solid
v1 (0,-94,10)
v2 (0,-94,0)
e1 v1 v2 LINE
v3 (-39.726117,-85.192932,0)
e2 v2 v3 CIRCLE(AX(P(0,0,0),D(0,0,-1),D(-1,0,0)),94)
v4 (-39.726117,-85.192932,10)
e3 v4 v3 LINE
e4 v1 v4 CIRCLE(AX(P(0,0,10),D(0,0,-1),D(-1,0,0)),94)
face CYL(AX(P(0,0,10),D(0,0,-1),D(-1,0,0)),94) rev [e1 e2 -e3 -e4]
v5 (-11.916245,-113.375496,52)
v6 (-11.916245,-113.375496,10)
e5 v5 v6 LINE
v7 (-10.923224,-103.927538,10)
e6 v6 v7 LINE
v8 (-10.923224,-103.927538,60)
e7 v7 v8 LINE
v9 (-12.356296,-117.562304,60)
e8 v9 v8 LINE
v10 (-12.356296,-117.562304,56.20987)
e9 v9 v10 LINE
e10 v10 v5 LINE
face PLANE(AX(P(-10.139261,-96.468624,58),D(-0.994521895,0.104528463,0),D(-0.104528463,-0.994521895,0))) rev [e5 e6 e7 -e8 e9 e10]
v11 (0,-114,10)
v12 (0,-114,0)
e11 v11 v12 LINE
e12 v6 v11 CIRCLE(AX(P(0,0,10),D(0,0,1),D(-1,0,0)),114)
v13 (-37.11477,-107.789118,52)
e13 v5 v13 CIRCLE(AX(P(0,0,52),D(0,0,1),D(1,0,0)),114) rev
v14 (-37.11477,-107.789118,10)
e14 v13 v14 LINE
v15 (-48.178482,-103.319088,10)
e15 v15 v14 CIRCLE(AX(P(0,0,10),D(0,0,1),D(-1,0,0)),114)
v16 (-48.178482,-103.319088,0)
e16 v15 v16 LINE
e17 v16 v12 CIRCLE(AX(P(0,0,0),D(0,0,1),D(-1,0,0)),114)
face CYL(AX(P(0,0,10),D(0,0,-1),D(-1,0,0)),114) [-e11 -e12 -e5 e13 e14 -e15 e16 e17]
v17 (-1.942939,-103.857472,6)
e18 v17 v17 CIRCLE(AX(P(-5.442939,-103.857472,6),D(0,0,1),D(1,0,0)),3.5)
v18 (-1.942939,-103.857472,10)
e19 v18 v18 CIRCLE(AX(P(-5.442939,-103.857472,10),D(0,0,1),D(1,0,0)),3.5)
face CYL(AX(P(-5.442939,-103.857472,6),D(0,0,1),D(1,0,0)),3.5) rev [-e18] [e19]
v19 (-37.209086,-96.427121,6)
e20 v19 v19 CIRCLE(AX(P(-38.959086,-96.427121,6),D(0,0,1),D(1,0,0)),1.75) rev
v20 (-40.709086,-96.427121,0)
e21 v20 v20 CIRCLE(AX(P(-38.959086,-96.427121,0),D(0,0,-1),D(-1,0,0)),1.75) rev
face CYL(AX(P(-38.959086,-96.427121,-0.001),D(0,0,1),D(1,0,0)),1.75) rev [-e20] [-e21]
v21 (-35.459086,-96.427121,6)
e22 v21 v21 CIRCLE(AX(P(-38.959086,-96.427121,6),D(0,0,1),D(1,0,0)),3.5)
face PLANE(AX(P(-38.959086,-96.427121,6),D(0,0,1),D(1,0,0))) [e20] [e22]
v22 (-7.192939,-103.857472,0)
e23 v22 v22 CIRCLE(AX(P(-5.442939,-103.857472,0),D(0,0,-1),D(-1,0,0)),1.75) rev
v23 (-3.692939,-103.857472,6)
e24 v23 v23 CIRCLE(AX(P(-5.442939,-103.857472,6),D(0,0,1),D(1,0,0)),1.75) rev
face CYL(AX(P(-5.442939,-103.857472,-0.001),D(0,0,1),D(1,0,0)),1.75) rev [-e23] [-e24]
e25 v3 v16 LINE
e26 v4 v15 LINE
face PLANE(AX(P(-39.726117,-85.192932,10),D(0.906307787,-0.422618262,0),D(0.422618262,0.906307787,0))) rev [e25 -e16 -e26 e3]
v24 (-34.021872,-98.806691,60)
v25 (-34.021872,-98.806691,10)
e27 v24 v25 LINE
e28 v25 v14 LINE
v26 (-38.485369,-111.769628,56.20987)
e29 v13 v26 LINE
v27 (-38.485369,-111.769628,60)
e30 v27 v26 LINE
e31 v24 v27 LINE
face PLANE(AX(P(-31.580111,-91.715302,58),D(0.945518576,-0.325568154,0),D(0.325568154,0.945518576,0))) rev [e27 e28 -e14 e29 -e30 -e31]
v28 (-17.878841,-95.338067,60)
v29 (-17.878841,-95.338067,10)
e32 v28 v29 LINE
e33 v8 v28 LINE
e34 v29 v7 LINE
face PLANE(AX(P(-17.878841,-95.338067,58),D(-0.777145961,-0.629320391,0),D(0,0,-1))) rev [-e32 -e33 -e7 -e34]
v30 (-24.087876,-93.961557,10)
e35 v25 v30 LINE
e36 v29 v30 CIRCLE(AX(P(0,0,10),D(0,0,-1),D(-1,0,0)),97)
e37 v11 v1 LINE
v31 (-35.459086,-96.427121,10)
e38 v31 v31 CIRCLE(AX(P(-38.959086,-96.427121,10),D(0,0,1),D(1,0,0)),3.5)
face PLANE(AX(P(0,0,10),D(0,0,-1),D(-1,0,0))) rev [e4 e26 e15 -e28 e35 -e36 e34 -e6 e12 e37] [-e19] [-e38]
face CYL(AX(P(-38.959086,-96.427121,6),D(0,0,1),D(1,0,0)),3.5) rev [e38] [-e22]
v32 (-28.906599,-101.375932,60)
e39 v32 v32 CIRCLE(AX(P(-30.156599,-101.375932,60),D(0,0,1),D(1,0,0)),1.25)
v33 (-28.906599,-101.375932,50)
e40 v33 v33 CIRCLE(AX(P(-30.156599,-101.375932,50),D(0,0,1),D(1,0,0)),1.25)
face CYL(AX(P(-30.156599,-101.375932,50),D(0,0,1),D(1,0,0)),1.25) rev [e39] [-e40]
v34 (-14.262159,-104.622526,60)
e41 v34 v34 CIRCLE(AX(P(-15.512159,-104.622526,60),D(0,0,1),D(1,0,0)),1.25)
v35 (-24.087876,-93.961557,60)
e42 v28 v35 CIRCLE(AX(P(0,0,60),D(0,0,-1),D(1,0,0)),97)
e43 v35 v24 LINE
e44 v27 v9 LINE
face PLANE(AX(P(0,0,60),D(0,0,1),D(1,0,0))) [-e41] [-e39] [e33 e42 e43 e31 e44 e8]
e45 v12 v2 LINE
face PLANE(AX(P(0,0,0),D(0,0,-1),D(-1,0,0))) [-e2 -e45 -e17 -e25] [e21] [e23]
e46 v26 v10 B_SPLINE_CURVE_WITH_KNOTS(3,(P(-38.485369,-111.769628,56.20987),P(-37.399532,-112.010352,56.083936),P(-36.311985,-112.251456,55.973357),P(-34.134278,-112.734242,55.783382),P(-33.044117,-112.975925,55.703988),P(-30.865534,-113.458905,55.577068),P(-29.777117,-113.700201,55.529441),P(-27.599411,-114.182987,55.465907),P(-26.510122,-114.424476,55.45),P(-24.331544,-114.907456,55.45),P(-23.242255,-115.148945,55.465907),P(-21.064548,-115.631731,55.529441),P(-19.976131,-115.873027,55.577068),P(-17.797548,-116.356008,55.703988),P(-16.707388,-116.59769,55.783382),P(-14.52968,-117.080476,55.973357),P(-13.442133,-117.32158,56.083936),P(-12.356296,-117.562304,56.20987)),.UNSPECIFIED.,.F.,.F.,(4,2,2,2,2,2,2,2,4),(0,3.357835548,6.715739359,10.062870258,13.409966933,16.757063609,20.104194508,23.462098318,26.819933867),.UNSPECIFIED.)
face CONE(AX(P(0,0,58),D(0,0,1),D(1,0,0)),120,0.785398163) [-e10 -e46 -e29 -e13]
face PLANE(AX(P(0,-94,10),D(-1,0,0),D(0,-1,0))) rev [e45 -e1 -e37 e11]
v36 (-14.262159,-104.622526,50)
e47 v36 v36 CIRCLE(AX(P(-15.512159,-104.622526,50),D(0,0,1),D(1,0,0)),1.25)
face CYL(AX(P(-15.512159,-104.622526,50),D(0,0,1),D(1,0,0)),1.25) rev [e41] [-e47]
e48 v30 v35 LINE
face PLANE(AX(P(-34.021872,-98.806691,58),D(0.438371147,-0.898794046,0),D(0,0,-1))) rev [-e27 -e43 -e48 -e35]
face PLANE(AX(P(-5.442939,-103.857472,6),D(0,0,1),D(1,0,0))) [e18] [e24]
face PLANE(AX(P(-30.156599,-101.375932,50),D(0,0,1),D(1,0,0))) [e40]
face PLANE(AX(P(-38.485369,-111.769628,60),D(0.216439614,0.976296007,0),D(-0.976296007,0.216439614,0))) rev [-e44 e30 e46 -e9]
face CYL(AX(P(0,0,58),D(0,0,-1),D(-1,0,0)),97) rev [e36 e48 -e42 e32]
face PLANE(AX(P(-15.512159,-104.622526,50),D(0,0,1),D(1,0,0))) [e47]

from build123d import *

# Parameters (mm, degrees)
BOSS_EXTRU_1_DEPTH      = 10
BOSS_EXTRU_2_DEPTH      = 48
BOSS_EXTRU_3_DEPTH      = 2
CHANFREIN1_SIZE         = 6
ENL_V_MAT_EXTRU_1_REACH = 138.536
ESQUISSE5_R             = 1.75
ESQUISSE6_R             = 3.5
ENL_V_MAT_EXTRU_2_DEPTH = 4
CHANFREIN2_SIZE         = 7.5
ESQUISSE7_R             = 1.25
ENL_V_MAT_EXTRU_3_DEPTH = 10


with BuildPart() as part:
    # Esquisse1 → Boss.-Extru.1 (new body)
    with BuildSketch(Plane.XY):
        with BuildLine():
            Line((-39.726116604, -85.192931981), (-48.178481838, -103.319087722))
            ThreePointArc((-48.178481838, -103.319087722), (-24.674115989, -111.297744812), (0, -114))
            Line((0, -114), (0, -94))
            ThreePointArc((0, -94), (-20.34532371, -91.771824669), (-39.726116604, -85.192931981))
        make_face()
    extrude(amount=BOSS_EXTRU_1_DEPTH)

    # Esquisse2 → Boss.-Extru.2 (add)
    with BuildSketch(Plane.XY.offset(10)):
        with BuildLine():
            Line((-31.580110982, -91.715301833), (-37.114769608, -107.789117618))
            ThreePointArc((-37.114769608, -107.789117618), (-24.674115989, -111.297744812), (-11.916244813, -113.375496072))
            Line((-11.916244813, -113.375496072), (-10.139260937, -96.468623851))
            ThreePointArc((-10.139260937, -96.468623851), (-20.994642552, -94.700712691), (-31.580110982, -91.715301833))
        make_face()
    extrude(amount=BOSS_EXTRU_2_DEPTH)

    # Esquisse4 → Boss.-Extru.3 (add)
    with BuildSketch(Plane.XY.offset(58)):
        with BuildLine():
            Line((-38.485369249, -111.769628004), (-12.356296065, -117.562304069))
            Line((-12.356296065, -117.562304069), (-10.139260937, -96.468623851))
            ThreePointArc((-10.139260937, -96.468623851), (-20.994642552, -94.700712691), (-31.580110982, -91.715301833))
            Line((-31.580110982, -91.715301833), (-38.485369249, -111.769628004))
        make_face()
    extrude(amount=BOSS_EXTRU_3_DEPTH)

    # Chanfrein1
    # the kernel refuses this chamfer: 6 mm, written as the material it adds along each edge
    with BuildSketch(Plane(origin=(0, 0, 58), x_dir=(-0.3255681544571537, -0.9455185755993178, 0), z_dir=(-0.9455185755993178, 0.3255681544571537, 0))) as chanfrein1_piece_1_section:
        Polygon((114 + CHANFREIN1_SIZE, 0), (114, -CHANFREIN1_SIZE), (114, 0), align=None)
    chanfrein1_piece_1 = revolve(axis=Axis((0, 0, 58), (0, 0, 1)), revolution_arc=13, mode=Mode.PRIVATE)
    chanfrein1_piece_1 = split(chanfrein1_piece_1, bisect_by=Plane(origin=(-25.420832657, -114.665966036, 58), z_dir=(0.21643961393810382, 0.9762960071199333, 0)), keep=Keep.TOP, mode=Mode.PRIVATE)
    add(chanfrein1_piece_1)

    # Esquisse5 → Enlèv. mat.-Extru.1 (cut, up to next)
    with BuildSketch(Plane.XY.offset(10), mode=Mode.PRIVATE) as enl_v_mat_extru_1_sk1:
        with Locations((-5.442939449, -103.857471614)):
            Circle(ESQUISSE5_R)
    enl_v_mat_extru_1_tool1 = extrude(enl_v_mat_extru_1_sk1.sketch, amount=-ENL_V_MAT_EXTRU_1_REACH, mode=Mode.PRIVATE) & part.part
    # Esquisse5 → Enlèv. mat.-Extru.1 (cut, up to next)
    with BuildSketch(Plane.XY.offset(10), mode=Mode.PRIVATE) as enl_v_mat_extru_1_sk2:
        with Locations((-38.959085715, -96.427120875)):
            Circle(ESQUISSE5_R)
    enl_v_mat_extru_1_tool2 = extrude(enl_v_mat_extru_1_sk2.sketch, amount=-ENL_V_MAT_EXTRU_1_REACH, mode=Mode.PRIVATE) & part.part
    add(enl_v_mat_extru_1_tool1.solids().sort_by_distance((-5.442939, -103.857472, 10))[0], mode=Mode.SUBTRACT)
    add(enl_v_mat_extru_1_tool2.solids().sort_by_distance((-38.959086, -96.427121, 10))[0], mode=Mode.SUBTRACT)

    # Esquisse6 → Enlèv. mat.-Extru.2 (cut)
    with BuildSketch(Plane.XY.offset(10)):
        with Locations((-38.959085715, -96.427120875)):
            Circle(ESQUISSE6_R)
        with Locations((-5.442939449, -103.857471614)):
            Circle(ESQUISSE6_R)
    extrude(amount=-ENL_V_MAT_EXTRU_2_DEPTH, mode=Mode.SUBTRACT)

    # Chanfrein2
    # the kernel refuses this chamfer: 7.5 mm, written as the material it takes off along each edge
    with BuildSketch(Plane(origin=(-10.139260937, -96.468623851, 10), x_dir=(-0.10452846326693861, -0.9945218953683486, 0), z_dir=(0, 0, 1)), Plane(origin=(-31.580110982, -91.715301833, 80.112002728), x_dir=(-0.3255681544565627, -0.9455185755995213, 0), z_dir=(0, 0, -1))) as chanfrein2_piece_1:
        with BuildLine():
            Line((CHANFREIN2_SIZE, 0), (-0.315356984, -7.815356984))
            ThreePointArc((-0.315356984, -7.815356984), (-0.083387766, -4.021227803), (0, 0))
            Line((0, 0), (CHANFREIN2_SIZE, 0))
        make_face()
    extrude(amount=70.112002728, mode=Mode.SUBTRACT)

    # Esquisse7 → Enlèv. mat.-Extru.3 (cut)
    with BuildSketch(Plane.XY.offset(60)):
        with Locations((-30.156599324, -101.375931647)):
            Circle(ESQUISSE7_R)
        with Locations((-15.512159217, -104.622525856)):
            Circle(ESQUISSE7_R)
    extrude(amount=-ENL_V_MAT_EXTRU_3_DEPTH, mode=Mode.SUBTRACT)


solid = part.part
